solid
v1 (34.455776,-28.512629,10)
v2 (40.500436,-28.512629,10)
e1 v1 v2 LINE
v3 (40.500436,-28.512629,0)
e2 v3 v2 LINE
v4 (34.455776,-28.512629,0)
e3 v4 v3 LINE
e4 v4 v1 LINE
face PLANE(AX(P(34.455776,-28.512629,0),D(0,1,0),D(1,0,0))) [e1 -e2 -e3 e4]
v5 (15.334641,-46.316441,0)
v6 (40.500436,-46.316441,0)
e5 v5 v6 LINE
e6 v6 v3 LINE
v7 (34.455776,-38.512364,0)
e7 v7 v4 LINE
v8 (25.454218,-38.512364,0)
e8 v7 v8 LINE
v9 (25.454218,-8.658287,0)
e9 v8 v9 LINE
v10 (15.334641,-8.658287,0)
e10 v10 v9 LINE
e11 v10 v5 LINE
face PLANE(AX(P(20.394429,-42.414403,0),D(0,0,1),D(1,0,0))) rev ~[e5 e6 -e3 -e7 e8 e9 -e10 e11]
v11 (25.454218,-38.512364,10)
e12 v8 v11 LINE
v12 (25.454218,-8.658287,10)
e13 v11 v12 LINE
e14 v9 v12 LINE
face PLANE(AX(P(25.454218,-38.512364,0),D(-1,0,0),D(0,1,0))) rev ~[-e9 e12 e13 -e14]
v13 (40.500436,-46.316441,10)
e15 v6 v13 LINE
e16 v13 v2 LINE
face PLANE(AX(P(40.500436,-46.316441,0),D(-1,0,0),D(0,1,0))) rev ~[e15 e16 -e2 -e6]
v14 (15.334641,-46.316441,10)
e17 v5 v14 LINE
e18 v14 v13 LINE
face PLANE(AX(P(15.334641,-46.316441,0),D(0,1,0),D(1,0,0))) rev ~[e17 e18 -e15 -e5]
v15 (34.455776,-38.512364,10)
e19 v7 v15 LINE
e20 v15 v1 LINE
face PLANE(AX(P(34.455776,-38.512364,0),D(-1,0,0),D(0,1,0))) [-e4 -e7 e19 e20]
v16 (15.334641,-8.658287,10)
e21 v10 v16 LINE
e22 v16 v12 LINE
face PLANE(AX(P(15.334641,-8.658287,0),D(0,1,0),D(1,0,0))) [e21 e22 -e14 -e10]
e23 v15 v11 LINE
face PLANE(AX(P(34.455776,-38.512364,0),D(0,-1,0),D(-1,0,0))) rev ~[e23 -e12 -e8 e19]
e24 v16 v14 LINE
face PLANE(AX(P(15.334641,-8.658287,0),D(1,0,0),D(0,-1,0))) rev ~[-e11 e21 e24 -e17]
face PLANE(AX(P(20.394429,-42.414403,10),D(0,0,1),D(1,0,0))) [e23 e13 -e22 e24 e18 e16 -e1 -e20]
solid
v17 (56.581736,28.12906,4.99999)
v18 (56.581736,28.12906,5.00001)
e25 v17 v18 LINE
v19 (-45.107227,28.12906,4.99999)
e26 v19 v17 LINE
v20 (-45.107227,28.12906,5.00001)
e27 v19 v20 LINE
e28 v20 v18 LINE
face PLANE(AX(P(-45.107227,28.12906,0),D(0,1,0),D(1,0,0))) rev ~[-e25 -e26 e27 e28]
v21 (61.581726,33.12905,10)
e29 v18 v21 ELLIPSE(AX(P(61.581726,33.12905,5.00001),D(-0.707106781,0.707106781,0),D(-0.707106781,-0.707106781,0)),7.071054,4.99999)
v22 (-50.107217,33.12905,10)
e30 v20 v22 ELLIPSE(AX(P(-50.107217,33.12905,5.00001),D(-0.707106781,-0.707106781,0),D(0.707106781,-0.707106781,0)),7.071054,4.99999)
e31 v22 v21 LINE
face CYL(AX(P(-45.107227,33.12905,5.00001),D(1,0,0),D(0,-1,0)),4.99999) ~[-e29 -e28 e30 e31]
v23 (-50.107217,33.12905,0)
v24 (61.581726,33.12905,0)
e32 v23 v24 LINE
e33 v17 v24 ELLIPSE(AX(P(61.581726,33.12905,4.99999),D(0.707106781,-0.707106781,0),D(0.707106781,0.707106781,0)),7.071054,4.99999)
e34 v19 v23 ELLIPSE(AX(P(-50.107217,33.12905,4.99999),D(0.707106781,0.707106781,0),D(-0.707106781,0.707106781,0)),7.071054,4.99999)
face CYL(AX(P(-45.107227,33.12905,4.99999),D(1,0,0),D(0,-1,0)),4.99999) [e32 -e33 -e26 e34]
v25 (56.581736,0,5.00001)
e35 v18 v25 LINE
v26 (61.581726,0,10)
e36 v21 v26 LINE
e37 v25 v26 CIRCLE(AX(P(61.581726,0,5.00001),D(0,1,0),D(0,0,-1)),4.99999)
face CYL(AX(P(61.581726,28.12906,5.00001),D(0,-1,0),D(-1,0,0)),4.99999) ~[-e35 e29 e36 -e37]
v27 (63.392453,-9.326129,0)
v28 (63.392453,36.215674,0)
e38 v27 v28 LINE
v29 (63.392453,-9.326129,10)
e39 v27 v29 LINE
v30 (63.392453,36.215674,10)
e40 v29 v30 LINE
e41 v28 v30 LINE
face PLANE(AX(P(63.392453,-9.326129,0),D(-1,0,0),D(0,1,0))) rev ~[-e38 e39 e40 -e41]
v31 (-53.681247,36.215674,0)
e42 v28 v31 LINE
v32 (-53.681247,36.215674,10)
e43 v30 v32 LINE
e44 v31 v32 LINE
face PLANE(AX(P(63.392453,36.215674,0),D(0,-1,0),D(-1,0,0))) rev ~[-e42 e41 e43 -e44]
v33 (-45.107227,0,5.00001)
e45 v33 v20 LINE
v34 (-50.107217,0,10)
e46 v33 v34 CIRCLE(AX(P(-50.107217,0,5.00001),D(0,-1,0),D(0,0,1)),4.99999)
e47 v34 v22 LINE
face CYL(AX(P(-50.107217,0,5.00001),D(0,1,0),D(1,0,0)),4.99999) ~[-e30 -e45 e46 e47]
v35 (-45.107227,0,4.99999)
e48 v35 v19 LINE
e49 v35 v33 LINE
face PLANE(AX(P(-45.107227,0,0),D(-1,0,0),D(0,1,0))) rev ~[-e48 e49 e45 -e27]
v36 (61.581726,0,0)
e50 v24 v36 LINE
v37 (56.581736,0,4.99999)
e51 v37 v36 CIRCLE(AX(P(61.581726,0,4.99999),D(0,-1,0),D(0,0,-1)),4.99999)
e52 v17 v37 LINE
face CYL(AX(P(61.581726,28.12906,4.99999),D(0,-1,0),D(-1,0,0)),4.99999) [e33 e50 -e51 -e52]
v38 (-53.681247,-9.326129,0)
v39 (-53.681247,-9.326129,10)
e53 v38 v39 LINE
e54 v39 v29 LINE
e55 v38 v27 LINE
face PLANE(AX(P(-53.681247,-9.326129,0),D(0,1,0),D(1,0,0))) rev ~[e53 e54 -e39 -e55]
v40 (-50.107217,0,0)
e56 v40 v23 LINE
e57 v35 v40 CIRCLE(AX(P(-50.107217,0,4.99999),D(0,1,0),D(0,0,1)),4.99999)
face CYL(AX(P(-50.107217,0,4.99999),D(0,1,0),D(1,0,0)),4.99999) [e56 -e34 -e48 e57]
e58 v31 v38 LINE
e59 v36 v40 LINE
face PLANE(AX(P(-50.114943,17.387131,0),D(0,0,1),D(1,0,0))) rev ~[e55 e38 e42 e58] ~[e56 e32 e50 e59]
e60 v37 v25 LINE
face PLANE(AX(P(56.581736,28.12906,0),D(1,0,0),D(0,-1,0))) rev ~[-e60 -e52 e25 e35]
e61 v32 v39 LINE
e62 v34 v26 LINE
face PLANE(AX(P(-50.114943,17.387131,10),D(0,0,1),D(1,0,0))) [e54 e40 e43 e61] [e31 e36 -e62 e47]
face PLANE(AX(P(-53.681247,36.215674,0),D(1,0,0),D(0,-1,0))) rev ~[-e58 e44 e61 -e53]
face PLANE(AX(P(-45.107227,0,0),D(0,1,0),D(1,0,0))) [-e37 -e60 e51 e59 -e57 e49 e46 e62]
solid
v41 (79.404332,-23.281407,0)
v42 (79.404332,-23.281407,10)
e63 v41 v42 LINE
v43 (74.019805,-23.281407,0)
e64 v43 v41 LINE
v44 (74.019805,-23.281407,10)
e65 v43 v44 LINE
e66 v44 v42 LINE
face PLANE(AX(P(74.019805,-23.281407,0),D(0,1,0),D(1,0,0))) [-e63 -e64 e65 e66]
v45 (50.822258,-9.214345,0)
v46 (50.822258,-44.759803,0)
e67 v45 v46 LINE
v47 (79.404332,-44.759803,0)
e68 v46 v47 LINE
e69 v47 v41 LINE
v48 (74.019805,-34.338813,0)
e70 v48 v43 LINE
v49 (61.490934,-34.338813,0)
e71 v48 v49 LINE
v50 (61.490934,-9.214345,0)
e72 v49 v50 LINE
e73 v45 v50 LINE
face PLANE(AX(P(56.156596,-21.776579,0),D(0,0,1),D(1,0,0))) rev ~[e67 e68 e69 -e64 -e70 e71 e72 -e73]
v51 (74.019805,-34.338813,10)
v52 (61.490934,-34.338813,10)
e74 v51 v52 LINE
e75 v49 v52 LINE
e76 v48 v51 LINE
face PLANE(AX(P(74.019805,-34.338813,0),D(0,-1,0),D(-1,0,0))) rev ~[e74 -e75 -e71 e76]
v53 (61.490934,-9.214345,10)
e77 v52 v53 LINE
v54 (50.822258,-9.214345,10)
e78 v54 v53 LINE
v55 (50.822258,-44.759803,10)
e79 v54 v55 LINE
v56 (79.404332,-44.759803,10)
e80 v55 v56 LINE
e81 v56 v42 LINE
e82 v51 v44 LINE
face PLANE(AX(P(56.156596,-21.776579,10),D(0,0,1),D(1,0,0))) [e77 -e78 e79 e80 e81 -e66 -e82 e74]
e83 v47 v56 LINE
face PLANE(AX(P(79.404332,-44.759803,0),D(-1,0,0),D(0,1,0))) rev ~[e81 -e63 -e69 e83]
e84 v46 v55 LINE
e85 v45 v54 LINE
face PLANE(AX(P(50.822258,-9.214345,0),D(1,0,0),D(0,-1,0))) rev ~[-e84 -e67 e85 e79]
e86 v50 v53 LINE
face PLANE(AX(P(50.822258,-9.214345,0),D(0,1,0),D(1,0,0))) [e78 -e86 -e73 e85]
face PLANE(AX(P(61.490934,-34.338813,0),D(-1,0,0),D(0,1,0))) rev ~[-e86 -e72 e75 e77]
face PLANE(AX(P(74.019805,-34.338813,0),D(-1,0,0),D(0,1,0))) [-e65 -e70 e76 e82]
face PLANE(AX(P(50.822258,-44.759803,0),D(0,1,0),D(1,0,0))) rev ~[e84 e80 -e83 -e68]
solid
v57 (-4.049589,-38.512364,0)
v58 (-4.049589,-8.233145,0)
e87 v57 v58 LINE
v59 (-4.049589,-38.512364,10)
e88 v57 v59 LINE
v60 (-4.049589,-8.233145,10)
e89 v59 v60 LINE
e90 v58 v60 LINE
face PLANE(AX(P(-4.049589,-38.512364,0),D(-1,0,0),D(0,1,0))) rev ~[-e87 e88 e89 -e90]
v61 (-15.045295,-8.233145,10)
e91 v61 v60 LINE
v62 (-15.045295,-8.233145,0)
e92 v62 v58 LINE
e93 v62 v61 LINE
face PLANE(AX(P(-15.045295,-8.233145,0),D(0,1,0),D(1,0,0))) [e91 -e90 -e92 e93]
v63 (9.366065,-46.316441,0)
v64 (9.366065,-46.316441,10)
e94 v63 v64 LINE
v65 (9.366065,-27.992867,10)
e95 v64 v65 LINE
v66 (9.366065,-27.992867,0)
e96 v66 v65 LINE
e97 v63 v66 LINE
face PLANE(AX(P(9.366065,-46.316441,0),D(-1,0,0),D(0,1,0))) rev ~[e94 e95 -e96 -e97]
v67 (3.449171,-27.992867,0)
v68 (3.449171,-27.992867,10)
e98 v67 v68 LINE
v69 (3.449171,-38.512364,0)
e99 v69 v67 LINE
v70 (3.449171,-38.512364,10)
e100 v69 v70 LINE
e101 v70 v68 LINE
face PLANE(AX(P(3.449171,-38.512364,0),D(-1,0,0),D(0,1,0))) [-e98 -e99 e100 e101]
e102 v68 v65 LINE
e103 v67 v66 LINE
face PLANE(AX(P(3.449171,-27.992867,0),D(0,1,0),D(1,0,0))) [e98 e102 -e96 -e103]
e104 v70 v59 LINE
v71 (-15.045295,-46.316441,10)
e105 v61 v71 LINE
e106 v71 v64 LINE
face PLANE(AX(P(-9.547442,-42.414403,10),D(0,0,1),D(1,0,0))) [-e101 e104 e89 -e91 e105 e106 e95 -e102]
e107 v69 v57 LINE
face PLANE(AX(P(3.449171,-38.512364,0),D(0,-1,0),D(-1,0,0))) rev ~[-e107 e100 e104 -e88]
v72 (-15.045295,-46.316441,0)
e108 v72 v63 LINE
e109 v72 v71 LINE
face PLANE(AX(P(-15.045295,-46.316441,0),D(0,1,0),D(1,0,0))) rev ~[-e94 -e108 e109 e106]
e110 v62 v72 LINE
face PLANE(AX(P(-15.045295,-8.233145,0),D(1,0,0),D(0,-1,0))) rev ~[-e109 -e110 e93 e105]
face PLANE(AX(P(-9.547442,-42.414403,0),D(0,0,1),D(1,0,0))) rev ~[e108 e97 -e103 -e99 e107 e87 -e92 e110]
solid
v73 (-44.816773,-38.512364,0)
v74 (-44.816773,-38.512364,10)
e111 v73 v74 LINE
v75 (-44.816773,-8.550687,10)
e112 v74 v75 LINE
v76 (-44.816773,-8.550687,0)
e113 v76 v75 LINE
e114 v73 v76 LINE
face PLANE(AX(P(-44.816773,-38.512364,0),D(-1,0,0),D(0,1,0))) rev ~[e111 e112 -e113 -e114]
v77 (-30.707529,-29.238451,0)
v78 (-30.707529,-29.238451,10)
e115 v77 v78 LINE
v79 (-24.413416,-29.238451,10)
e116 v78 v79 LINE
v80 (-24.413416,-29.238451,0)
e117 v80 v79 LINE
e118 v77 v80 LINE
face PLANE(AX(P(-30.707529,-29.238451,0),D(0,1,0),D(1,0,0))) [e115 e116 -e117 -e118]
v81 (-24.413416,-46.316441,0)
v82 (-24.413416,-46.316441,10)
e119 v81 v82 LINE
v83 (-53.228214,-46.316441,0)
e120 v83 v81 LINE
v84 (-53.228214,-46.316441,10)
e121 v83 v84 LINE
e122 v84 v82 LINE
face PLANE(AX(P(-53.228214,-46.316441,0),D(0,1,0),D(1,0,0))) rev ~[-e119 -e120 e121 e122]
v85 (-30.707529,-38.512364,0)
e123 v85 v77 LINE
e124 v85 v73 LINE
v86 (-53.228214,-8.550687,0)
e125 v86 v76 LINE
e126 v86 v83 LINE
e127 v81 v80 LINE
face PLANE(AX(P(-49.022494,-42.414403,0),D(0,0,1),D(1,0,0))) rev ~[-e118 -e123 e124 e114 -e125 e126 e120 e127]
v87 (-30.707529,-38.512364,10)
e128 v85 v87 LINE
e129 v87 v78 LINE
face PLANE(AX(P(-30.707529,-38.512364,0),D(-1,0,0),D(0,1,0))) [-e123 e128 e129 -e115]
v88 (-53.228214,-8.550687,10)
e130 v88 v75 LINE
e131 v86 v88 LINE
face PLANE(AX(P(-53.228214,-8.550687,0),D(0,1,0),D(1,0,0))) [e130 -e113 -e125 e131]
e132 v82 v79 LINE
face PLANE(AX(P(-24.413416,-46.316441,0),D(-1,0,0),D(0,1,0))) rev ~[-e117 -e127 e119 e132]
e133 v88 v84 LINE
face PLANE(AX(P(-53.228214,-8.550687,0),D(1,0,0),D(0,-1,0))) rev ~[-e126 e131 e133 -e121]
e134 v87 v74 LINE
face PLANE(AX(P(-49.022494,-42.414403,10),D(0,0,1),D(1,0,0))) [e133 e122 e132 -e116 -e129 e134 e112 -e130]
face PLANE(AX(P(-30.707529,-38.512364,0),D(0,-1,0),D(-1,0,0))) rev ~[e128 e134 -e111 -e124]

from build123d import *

# Parameters (mm, degrees)
F0_W     = 7.9836137593
F0_H     = 8.0866143107
F0_W_2   = 101.6889624298
F0_W_3   = 6.8107172847
F0_H_2   = 28.1290598214
F0_H_3   = 9.3261292204
F0_W_4   = 8.5740201175
F2_DEPTH = 10
F1_W     = 8.4114409983
F1_H     = 7.8040771186
F1_H_2   = 29.9616772681
F1_W_2   = 14.1092445701
F1_W_3   = 6.2941126525
F1_H_3   = 9.2739127576
F1_W_4   = 10.995705612
F1_H_4   = 30.2792191505
F1_W_5   = 7.4987595435
F1_W_6   = 5.9168946464
F1_H_5   = 10.5194970965
F1_W_7   = 10.1195769385
F1_H_6   = 29.8540769145
F1_W_8   = 9.0015586466
F1_W_9   = 6.0446597636
F1_H_7   = 9.9997352809
F1_W_10  = 10.6686763465
F1_H_8   = 25.1244679093
F1_H_9   = 10.4209892452
F1_W_11  = 12.5288702548
F1_W_12  = 5.3845271468
F1_H_10  = 11.0574066639
F3_R     = 4.99999


# Not quite as in the source:
# - a fillet or chamfer is up to 0.001 mm smaller than in the source, because OpenCascade refuses the exact size


with BuildPart() as f2:
    # F0 (on Top) → F2 (new body)
    with BuildSketch(Plane.XY):
        Polygon((-53.0908405781, 28.1290598214), (-53.0908405781, 36.2156741321), (-53.6812469363, 36.2156741321), (-53.6812469363, 0), (-45.1072268188, 0), (-45.1072268188, 28.1290598214), align=None)
        with Locations((-49.0990336984, 32.1723669767)):
            Rectangle(F0_W, F0_H)
        with Locations((5.7372543961, 32.1723669767)):
            Rectangle(F0_W_2, F0_H)
        with Locations((59.9870942533, 32.1723669767)):
            Rectangle(F0_W_3, F0_H)
        with Locations((59.9870942533, 14.0645299107)):
            Rectangle(F0_W_3, F0_H_2)
        with Locations((59.9870942533, -4.6630646102)):
            Rectangle(F0_W_3, F0_H_3)
        with Locations((-49.3942368776, -4.6630646102)):
            Rectangle(F0_W_4, F0_H_3)
        with Locations((5.7372543961, -4.6630646102)):
            Rectangle(F0_W_2, F0_H_3)
    extrude(amount=F2_DEPTH)

    # F3 (radius 5 in the source; OpenCascade refuses exactly that, so slightly less here)
    f3_edges = [f2.edges().sort_by_distance(p)[0] for p in [
        (-45.107227, 14.06453, 0),
        (5.737254, 28.12906, 0),
        (56.581736, 14.06453, 10),
        (5.737254, 28.12906, 10),
        (-45.107227, 14.06453, 10),
        (56.581736, 14.06453, 0),
    ]]
    fillet(f3_edges, radius=F3_R)


with BuildPart() as f2b:
    # F1 (on Top) → F2, piece 2 (new body)
    with BuildSketch(Plane.XY):
        with Locations((-49.022493884, -42.4144025892)):
            Rectangle(F1_W, F1_H)
        with Locations((-49.022493884, -23.5315253958)):
            Rectangle(F1_W, F1_H_2)
        with Locations((-37.7621510997, -42.4144025892)):
            Rectangle(F1_W_2, F1_H)
        with Locations((-27.5604724884, -42.4144025892)):
            Rectangle(F1_W_3, F1_H)
        with Locations((-27.5604724884, -33.8754076511)):
            Rectangle(F1_W_3, F1_H_3)
    extrude(amount=F2_DEPTH)


with BuildPart() as f2c:
    # F1 (on Top) → F2, piece 3 (new body)
    with BuildSketch(Plane.XY):
        with Locations((-9.5474417321, -42.4144025892)):
            Rectangle(F1_W_4, F1_H)
        with Locations((-9.5474417321, -23.3727544546)):
            Rectangle(F1_W_4, F1_H_4)
        with Locations((-0.3002091544, -42.4144025892)):
            Rectangle(F1_W_5, F1_H)
        with Locations((6.4076179406, -42.4144025892)):
            Rectangle(F1_W_6, F1_H)
        with Locations((6.4076179406, -33.2526154816)):
            Rectangle(F1_W_6, F1_H_5)
    extrude(amount=F2_DEPTH)


with BuildPart() as f2d:
    # F1 (on Top) → F2, piece 4 (new body)
    with BuildSketch(Plane.XY):
        with Locations((20.3944290988, -42.4144025892)):
            Rectangle(F1_W_7, F1_H)
        with Locations((20.3944290988, -23.5853255726)):
            Rectangle(F1_W_7, F1_H_6)
        with Locations((29.9549968913, -42.4144025892)):
            Rectangle(F1_W_8, F1_H)
        with Locations((37.4781060964, -42.4144025892)):
            Rectangle(F1_W_9, F1_H)
        with Locations((37.4781060964, -33.5124963894)):
            Rectangle(F1_W_9, F1_H_7)
    extrude(amount=F2_DEPTH)


with BuildPart() as f2e:
    # F1 (on Top) → F2, piece 5 (new body)
    with BuildSketch(Plane.XY):
        with Locations((56.1565961689, -21.7765793204)):
            Rectangle(F1_W_10, F1_H_8)
        with Locations((56.1565961689, -39.5493078977)):
            Rectangle(F1_W_10, F1_H_9)
        with Locations((67.7553694695, -39.5493078977)):
            Rectangle(F1_W_11, F1_H_9)
        with Locations((76.7120681703, -39.5493078977)):
            Rectangle(F1_W_12, F1_H_9)
        with Locations((76.7120681703, -28.8101099432)):
            Rectangle(F1_W_12, F1_H_10)
    extrude(amount=F2_DEPTH)


solid = Compound([f2.part, f2b.part, f2c.part, f2d.part, f2e.part])
